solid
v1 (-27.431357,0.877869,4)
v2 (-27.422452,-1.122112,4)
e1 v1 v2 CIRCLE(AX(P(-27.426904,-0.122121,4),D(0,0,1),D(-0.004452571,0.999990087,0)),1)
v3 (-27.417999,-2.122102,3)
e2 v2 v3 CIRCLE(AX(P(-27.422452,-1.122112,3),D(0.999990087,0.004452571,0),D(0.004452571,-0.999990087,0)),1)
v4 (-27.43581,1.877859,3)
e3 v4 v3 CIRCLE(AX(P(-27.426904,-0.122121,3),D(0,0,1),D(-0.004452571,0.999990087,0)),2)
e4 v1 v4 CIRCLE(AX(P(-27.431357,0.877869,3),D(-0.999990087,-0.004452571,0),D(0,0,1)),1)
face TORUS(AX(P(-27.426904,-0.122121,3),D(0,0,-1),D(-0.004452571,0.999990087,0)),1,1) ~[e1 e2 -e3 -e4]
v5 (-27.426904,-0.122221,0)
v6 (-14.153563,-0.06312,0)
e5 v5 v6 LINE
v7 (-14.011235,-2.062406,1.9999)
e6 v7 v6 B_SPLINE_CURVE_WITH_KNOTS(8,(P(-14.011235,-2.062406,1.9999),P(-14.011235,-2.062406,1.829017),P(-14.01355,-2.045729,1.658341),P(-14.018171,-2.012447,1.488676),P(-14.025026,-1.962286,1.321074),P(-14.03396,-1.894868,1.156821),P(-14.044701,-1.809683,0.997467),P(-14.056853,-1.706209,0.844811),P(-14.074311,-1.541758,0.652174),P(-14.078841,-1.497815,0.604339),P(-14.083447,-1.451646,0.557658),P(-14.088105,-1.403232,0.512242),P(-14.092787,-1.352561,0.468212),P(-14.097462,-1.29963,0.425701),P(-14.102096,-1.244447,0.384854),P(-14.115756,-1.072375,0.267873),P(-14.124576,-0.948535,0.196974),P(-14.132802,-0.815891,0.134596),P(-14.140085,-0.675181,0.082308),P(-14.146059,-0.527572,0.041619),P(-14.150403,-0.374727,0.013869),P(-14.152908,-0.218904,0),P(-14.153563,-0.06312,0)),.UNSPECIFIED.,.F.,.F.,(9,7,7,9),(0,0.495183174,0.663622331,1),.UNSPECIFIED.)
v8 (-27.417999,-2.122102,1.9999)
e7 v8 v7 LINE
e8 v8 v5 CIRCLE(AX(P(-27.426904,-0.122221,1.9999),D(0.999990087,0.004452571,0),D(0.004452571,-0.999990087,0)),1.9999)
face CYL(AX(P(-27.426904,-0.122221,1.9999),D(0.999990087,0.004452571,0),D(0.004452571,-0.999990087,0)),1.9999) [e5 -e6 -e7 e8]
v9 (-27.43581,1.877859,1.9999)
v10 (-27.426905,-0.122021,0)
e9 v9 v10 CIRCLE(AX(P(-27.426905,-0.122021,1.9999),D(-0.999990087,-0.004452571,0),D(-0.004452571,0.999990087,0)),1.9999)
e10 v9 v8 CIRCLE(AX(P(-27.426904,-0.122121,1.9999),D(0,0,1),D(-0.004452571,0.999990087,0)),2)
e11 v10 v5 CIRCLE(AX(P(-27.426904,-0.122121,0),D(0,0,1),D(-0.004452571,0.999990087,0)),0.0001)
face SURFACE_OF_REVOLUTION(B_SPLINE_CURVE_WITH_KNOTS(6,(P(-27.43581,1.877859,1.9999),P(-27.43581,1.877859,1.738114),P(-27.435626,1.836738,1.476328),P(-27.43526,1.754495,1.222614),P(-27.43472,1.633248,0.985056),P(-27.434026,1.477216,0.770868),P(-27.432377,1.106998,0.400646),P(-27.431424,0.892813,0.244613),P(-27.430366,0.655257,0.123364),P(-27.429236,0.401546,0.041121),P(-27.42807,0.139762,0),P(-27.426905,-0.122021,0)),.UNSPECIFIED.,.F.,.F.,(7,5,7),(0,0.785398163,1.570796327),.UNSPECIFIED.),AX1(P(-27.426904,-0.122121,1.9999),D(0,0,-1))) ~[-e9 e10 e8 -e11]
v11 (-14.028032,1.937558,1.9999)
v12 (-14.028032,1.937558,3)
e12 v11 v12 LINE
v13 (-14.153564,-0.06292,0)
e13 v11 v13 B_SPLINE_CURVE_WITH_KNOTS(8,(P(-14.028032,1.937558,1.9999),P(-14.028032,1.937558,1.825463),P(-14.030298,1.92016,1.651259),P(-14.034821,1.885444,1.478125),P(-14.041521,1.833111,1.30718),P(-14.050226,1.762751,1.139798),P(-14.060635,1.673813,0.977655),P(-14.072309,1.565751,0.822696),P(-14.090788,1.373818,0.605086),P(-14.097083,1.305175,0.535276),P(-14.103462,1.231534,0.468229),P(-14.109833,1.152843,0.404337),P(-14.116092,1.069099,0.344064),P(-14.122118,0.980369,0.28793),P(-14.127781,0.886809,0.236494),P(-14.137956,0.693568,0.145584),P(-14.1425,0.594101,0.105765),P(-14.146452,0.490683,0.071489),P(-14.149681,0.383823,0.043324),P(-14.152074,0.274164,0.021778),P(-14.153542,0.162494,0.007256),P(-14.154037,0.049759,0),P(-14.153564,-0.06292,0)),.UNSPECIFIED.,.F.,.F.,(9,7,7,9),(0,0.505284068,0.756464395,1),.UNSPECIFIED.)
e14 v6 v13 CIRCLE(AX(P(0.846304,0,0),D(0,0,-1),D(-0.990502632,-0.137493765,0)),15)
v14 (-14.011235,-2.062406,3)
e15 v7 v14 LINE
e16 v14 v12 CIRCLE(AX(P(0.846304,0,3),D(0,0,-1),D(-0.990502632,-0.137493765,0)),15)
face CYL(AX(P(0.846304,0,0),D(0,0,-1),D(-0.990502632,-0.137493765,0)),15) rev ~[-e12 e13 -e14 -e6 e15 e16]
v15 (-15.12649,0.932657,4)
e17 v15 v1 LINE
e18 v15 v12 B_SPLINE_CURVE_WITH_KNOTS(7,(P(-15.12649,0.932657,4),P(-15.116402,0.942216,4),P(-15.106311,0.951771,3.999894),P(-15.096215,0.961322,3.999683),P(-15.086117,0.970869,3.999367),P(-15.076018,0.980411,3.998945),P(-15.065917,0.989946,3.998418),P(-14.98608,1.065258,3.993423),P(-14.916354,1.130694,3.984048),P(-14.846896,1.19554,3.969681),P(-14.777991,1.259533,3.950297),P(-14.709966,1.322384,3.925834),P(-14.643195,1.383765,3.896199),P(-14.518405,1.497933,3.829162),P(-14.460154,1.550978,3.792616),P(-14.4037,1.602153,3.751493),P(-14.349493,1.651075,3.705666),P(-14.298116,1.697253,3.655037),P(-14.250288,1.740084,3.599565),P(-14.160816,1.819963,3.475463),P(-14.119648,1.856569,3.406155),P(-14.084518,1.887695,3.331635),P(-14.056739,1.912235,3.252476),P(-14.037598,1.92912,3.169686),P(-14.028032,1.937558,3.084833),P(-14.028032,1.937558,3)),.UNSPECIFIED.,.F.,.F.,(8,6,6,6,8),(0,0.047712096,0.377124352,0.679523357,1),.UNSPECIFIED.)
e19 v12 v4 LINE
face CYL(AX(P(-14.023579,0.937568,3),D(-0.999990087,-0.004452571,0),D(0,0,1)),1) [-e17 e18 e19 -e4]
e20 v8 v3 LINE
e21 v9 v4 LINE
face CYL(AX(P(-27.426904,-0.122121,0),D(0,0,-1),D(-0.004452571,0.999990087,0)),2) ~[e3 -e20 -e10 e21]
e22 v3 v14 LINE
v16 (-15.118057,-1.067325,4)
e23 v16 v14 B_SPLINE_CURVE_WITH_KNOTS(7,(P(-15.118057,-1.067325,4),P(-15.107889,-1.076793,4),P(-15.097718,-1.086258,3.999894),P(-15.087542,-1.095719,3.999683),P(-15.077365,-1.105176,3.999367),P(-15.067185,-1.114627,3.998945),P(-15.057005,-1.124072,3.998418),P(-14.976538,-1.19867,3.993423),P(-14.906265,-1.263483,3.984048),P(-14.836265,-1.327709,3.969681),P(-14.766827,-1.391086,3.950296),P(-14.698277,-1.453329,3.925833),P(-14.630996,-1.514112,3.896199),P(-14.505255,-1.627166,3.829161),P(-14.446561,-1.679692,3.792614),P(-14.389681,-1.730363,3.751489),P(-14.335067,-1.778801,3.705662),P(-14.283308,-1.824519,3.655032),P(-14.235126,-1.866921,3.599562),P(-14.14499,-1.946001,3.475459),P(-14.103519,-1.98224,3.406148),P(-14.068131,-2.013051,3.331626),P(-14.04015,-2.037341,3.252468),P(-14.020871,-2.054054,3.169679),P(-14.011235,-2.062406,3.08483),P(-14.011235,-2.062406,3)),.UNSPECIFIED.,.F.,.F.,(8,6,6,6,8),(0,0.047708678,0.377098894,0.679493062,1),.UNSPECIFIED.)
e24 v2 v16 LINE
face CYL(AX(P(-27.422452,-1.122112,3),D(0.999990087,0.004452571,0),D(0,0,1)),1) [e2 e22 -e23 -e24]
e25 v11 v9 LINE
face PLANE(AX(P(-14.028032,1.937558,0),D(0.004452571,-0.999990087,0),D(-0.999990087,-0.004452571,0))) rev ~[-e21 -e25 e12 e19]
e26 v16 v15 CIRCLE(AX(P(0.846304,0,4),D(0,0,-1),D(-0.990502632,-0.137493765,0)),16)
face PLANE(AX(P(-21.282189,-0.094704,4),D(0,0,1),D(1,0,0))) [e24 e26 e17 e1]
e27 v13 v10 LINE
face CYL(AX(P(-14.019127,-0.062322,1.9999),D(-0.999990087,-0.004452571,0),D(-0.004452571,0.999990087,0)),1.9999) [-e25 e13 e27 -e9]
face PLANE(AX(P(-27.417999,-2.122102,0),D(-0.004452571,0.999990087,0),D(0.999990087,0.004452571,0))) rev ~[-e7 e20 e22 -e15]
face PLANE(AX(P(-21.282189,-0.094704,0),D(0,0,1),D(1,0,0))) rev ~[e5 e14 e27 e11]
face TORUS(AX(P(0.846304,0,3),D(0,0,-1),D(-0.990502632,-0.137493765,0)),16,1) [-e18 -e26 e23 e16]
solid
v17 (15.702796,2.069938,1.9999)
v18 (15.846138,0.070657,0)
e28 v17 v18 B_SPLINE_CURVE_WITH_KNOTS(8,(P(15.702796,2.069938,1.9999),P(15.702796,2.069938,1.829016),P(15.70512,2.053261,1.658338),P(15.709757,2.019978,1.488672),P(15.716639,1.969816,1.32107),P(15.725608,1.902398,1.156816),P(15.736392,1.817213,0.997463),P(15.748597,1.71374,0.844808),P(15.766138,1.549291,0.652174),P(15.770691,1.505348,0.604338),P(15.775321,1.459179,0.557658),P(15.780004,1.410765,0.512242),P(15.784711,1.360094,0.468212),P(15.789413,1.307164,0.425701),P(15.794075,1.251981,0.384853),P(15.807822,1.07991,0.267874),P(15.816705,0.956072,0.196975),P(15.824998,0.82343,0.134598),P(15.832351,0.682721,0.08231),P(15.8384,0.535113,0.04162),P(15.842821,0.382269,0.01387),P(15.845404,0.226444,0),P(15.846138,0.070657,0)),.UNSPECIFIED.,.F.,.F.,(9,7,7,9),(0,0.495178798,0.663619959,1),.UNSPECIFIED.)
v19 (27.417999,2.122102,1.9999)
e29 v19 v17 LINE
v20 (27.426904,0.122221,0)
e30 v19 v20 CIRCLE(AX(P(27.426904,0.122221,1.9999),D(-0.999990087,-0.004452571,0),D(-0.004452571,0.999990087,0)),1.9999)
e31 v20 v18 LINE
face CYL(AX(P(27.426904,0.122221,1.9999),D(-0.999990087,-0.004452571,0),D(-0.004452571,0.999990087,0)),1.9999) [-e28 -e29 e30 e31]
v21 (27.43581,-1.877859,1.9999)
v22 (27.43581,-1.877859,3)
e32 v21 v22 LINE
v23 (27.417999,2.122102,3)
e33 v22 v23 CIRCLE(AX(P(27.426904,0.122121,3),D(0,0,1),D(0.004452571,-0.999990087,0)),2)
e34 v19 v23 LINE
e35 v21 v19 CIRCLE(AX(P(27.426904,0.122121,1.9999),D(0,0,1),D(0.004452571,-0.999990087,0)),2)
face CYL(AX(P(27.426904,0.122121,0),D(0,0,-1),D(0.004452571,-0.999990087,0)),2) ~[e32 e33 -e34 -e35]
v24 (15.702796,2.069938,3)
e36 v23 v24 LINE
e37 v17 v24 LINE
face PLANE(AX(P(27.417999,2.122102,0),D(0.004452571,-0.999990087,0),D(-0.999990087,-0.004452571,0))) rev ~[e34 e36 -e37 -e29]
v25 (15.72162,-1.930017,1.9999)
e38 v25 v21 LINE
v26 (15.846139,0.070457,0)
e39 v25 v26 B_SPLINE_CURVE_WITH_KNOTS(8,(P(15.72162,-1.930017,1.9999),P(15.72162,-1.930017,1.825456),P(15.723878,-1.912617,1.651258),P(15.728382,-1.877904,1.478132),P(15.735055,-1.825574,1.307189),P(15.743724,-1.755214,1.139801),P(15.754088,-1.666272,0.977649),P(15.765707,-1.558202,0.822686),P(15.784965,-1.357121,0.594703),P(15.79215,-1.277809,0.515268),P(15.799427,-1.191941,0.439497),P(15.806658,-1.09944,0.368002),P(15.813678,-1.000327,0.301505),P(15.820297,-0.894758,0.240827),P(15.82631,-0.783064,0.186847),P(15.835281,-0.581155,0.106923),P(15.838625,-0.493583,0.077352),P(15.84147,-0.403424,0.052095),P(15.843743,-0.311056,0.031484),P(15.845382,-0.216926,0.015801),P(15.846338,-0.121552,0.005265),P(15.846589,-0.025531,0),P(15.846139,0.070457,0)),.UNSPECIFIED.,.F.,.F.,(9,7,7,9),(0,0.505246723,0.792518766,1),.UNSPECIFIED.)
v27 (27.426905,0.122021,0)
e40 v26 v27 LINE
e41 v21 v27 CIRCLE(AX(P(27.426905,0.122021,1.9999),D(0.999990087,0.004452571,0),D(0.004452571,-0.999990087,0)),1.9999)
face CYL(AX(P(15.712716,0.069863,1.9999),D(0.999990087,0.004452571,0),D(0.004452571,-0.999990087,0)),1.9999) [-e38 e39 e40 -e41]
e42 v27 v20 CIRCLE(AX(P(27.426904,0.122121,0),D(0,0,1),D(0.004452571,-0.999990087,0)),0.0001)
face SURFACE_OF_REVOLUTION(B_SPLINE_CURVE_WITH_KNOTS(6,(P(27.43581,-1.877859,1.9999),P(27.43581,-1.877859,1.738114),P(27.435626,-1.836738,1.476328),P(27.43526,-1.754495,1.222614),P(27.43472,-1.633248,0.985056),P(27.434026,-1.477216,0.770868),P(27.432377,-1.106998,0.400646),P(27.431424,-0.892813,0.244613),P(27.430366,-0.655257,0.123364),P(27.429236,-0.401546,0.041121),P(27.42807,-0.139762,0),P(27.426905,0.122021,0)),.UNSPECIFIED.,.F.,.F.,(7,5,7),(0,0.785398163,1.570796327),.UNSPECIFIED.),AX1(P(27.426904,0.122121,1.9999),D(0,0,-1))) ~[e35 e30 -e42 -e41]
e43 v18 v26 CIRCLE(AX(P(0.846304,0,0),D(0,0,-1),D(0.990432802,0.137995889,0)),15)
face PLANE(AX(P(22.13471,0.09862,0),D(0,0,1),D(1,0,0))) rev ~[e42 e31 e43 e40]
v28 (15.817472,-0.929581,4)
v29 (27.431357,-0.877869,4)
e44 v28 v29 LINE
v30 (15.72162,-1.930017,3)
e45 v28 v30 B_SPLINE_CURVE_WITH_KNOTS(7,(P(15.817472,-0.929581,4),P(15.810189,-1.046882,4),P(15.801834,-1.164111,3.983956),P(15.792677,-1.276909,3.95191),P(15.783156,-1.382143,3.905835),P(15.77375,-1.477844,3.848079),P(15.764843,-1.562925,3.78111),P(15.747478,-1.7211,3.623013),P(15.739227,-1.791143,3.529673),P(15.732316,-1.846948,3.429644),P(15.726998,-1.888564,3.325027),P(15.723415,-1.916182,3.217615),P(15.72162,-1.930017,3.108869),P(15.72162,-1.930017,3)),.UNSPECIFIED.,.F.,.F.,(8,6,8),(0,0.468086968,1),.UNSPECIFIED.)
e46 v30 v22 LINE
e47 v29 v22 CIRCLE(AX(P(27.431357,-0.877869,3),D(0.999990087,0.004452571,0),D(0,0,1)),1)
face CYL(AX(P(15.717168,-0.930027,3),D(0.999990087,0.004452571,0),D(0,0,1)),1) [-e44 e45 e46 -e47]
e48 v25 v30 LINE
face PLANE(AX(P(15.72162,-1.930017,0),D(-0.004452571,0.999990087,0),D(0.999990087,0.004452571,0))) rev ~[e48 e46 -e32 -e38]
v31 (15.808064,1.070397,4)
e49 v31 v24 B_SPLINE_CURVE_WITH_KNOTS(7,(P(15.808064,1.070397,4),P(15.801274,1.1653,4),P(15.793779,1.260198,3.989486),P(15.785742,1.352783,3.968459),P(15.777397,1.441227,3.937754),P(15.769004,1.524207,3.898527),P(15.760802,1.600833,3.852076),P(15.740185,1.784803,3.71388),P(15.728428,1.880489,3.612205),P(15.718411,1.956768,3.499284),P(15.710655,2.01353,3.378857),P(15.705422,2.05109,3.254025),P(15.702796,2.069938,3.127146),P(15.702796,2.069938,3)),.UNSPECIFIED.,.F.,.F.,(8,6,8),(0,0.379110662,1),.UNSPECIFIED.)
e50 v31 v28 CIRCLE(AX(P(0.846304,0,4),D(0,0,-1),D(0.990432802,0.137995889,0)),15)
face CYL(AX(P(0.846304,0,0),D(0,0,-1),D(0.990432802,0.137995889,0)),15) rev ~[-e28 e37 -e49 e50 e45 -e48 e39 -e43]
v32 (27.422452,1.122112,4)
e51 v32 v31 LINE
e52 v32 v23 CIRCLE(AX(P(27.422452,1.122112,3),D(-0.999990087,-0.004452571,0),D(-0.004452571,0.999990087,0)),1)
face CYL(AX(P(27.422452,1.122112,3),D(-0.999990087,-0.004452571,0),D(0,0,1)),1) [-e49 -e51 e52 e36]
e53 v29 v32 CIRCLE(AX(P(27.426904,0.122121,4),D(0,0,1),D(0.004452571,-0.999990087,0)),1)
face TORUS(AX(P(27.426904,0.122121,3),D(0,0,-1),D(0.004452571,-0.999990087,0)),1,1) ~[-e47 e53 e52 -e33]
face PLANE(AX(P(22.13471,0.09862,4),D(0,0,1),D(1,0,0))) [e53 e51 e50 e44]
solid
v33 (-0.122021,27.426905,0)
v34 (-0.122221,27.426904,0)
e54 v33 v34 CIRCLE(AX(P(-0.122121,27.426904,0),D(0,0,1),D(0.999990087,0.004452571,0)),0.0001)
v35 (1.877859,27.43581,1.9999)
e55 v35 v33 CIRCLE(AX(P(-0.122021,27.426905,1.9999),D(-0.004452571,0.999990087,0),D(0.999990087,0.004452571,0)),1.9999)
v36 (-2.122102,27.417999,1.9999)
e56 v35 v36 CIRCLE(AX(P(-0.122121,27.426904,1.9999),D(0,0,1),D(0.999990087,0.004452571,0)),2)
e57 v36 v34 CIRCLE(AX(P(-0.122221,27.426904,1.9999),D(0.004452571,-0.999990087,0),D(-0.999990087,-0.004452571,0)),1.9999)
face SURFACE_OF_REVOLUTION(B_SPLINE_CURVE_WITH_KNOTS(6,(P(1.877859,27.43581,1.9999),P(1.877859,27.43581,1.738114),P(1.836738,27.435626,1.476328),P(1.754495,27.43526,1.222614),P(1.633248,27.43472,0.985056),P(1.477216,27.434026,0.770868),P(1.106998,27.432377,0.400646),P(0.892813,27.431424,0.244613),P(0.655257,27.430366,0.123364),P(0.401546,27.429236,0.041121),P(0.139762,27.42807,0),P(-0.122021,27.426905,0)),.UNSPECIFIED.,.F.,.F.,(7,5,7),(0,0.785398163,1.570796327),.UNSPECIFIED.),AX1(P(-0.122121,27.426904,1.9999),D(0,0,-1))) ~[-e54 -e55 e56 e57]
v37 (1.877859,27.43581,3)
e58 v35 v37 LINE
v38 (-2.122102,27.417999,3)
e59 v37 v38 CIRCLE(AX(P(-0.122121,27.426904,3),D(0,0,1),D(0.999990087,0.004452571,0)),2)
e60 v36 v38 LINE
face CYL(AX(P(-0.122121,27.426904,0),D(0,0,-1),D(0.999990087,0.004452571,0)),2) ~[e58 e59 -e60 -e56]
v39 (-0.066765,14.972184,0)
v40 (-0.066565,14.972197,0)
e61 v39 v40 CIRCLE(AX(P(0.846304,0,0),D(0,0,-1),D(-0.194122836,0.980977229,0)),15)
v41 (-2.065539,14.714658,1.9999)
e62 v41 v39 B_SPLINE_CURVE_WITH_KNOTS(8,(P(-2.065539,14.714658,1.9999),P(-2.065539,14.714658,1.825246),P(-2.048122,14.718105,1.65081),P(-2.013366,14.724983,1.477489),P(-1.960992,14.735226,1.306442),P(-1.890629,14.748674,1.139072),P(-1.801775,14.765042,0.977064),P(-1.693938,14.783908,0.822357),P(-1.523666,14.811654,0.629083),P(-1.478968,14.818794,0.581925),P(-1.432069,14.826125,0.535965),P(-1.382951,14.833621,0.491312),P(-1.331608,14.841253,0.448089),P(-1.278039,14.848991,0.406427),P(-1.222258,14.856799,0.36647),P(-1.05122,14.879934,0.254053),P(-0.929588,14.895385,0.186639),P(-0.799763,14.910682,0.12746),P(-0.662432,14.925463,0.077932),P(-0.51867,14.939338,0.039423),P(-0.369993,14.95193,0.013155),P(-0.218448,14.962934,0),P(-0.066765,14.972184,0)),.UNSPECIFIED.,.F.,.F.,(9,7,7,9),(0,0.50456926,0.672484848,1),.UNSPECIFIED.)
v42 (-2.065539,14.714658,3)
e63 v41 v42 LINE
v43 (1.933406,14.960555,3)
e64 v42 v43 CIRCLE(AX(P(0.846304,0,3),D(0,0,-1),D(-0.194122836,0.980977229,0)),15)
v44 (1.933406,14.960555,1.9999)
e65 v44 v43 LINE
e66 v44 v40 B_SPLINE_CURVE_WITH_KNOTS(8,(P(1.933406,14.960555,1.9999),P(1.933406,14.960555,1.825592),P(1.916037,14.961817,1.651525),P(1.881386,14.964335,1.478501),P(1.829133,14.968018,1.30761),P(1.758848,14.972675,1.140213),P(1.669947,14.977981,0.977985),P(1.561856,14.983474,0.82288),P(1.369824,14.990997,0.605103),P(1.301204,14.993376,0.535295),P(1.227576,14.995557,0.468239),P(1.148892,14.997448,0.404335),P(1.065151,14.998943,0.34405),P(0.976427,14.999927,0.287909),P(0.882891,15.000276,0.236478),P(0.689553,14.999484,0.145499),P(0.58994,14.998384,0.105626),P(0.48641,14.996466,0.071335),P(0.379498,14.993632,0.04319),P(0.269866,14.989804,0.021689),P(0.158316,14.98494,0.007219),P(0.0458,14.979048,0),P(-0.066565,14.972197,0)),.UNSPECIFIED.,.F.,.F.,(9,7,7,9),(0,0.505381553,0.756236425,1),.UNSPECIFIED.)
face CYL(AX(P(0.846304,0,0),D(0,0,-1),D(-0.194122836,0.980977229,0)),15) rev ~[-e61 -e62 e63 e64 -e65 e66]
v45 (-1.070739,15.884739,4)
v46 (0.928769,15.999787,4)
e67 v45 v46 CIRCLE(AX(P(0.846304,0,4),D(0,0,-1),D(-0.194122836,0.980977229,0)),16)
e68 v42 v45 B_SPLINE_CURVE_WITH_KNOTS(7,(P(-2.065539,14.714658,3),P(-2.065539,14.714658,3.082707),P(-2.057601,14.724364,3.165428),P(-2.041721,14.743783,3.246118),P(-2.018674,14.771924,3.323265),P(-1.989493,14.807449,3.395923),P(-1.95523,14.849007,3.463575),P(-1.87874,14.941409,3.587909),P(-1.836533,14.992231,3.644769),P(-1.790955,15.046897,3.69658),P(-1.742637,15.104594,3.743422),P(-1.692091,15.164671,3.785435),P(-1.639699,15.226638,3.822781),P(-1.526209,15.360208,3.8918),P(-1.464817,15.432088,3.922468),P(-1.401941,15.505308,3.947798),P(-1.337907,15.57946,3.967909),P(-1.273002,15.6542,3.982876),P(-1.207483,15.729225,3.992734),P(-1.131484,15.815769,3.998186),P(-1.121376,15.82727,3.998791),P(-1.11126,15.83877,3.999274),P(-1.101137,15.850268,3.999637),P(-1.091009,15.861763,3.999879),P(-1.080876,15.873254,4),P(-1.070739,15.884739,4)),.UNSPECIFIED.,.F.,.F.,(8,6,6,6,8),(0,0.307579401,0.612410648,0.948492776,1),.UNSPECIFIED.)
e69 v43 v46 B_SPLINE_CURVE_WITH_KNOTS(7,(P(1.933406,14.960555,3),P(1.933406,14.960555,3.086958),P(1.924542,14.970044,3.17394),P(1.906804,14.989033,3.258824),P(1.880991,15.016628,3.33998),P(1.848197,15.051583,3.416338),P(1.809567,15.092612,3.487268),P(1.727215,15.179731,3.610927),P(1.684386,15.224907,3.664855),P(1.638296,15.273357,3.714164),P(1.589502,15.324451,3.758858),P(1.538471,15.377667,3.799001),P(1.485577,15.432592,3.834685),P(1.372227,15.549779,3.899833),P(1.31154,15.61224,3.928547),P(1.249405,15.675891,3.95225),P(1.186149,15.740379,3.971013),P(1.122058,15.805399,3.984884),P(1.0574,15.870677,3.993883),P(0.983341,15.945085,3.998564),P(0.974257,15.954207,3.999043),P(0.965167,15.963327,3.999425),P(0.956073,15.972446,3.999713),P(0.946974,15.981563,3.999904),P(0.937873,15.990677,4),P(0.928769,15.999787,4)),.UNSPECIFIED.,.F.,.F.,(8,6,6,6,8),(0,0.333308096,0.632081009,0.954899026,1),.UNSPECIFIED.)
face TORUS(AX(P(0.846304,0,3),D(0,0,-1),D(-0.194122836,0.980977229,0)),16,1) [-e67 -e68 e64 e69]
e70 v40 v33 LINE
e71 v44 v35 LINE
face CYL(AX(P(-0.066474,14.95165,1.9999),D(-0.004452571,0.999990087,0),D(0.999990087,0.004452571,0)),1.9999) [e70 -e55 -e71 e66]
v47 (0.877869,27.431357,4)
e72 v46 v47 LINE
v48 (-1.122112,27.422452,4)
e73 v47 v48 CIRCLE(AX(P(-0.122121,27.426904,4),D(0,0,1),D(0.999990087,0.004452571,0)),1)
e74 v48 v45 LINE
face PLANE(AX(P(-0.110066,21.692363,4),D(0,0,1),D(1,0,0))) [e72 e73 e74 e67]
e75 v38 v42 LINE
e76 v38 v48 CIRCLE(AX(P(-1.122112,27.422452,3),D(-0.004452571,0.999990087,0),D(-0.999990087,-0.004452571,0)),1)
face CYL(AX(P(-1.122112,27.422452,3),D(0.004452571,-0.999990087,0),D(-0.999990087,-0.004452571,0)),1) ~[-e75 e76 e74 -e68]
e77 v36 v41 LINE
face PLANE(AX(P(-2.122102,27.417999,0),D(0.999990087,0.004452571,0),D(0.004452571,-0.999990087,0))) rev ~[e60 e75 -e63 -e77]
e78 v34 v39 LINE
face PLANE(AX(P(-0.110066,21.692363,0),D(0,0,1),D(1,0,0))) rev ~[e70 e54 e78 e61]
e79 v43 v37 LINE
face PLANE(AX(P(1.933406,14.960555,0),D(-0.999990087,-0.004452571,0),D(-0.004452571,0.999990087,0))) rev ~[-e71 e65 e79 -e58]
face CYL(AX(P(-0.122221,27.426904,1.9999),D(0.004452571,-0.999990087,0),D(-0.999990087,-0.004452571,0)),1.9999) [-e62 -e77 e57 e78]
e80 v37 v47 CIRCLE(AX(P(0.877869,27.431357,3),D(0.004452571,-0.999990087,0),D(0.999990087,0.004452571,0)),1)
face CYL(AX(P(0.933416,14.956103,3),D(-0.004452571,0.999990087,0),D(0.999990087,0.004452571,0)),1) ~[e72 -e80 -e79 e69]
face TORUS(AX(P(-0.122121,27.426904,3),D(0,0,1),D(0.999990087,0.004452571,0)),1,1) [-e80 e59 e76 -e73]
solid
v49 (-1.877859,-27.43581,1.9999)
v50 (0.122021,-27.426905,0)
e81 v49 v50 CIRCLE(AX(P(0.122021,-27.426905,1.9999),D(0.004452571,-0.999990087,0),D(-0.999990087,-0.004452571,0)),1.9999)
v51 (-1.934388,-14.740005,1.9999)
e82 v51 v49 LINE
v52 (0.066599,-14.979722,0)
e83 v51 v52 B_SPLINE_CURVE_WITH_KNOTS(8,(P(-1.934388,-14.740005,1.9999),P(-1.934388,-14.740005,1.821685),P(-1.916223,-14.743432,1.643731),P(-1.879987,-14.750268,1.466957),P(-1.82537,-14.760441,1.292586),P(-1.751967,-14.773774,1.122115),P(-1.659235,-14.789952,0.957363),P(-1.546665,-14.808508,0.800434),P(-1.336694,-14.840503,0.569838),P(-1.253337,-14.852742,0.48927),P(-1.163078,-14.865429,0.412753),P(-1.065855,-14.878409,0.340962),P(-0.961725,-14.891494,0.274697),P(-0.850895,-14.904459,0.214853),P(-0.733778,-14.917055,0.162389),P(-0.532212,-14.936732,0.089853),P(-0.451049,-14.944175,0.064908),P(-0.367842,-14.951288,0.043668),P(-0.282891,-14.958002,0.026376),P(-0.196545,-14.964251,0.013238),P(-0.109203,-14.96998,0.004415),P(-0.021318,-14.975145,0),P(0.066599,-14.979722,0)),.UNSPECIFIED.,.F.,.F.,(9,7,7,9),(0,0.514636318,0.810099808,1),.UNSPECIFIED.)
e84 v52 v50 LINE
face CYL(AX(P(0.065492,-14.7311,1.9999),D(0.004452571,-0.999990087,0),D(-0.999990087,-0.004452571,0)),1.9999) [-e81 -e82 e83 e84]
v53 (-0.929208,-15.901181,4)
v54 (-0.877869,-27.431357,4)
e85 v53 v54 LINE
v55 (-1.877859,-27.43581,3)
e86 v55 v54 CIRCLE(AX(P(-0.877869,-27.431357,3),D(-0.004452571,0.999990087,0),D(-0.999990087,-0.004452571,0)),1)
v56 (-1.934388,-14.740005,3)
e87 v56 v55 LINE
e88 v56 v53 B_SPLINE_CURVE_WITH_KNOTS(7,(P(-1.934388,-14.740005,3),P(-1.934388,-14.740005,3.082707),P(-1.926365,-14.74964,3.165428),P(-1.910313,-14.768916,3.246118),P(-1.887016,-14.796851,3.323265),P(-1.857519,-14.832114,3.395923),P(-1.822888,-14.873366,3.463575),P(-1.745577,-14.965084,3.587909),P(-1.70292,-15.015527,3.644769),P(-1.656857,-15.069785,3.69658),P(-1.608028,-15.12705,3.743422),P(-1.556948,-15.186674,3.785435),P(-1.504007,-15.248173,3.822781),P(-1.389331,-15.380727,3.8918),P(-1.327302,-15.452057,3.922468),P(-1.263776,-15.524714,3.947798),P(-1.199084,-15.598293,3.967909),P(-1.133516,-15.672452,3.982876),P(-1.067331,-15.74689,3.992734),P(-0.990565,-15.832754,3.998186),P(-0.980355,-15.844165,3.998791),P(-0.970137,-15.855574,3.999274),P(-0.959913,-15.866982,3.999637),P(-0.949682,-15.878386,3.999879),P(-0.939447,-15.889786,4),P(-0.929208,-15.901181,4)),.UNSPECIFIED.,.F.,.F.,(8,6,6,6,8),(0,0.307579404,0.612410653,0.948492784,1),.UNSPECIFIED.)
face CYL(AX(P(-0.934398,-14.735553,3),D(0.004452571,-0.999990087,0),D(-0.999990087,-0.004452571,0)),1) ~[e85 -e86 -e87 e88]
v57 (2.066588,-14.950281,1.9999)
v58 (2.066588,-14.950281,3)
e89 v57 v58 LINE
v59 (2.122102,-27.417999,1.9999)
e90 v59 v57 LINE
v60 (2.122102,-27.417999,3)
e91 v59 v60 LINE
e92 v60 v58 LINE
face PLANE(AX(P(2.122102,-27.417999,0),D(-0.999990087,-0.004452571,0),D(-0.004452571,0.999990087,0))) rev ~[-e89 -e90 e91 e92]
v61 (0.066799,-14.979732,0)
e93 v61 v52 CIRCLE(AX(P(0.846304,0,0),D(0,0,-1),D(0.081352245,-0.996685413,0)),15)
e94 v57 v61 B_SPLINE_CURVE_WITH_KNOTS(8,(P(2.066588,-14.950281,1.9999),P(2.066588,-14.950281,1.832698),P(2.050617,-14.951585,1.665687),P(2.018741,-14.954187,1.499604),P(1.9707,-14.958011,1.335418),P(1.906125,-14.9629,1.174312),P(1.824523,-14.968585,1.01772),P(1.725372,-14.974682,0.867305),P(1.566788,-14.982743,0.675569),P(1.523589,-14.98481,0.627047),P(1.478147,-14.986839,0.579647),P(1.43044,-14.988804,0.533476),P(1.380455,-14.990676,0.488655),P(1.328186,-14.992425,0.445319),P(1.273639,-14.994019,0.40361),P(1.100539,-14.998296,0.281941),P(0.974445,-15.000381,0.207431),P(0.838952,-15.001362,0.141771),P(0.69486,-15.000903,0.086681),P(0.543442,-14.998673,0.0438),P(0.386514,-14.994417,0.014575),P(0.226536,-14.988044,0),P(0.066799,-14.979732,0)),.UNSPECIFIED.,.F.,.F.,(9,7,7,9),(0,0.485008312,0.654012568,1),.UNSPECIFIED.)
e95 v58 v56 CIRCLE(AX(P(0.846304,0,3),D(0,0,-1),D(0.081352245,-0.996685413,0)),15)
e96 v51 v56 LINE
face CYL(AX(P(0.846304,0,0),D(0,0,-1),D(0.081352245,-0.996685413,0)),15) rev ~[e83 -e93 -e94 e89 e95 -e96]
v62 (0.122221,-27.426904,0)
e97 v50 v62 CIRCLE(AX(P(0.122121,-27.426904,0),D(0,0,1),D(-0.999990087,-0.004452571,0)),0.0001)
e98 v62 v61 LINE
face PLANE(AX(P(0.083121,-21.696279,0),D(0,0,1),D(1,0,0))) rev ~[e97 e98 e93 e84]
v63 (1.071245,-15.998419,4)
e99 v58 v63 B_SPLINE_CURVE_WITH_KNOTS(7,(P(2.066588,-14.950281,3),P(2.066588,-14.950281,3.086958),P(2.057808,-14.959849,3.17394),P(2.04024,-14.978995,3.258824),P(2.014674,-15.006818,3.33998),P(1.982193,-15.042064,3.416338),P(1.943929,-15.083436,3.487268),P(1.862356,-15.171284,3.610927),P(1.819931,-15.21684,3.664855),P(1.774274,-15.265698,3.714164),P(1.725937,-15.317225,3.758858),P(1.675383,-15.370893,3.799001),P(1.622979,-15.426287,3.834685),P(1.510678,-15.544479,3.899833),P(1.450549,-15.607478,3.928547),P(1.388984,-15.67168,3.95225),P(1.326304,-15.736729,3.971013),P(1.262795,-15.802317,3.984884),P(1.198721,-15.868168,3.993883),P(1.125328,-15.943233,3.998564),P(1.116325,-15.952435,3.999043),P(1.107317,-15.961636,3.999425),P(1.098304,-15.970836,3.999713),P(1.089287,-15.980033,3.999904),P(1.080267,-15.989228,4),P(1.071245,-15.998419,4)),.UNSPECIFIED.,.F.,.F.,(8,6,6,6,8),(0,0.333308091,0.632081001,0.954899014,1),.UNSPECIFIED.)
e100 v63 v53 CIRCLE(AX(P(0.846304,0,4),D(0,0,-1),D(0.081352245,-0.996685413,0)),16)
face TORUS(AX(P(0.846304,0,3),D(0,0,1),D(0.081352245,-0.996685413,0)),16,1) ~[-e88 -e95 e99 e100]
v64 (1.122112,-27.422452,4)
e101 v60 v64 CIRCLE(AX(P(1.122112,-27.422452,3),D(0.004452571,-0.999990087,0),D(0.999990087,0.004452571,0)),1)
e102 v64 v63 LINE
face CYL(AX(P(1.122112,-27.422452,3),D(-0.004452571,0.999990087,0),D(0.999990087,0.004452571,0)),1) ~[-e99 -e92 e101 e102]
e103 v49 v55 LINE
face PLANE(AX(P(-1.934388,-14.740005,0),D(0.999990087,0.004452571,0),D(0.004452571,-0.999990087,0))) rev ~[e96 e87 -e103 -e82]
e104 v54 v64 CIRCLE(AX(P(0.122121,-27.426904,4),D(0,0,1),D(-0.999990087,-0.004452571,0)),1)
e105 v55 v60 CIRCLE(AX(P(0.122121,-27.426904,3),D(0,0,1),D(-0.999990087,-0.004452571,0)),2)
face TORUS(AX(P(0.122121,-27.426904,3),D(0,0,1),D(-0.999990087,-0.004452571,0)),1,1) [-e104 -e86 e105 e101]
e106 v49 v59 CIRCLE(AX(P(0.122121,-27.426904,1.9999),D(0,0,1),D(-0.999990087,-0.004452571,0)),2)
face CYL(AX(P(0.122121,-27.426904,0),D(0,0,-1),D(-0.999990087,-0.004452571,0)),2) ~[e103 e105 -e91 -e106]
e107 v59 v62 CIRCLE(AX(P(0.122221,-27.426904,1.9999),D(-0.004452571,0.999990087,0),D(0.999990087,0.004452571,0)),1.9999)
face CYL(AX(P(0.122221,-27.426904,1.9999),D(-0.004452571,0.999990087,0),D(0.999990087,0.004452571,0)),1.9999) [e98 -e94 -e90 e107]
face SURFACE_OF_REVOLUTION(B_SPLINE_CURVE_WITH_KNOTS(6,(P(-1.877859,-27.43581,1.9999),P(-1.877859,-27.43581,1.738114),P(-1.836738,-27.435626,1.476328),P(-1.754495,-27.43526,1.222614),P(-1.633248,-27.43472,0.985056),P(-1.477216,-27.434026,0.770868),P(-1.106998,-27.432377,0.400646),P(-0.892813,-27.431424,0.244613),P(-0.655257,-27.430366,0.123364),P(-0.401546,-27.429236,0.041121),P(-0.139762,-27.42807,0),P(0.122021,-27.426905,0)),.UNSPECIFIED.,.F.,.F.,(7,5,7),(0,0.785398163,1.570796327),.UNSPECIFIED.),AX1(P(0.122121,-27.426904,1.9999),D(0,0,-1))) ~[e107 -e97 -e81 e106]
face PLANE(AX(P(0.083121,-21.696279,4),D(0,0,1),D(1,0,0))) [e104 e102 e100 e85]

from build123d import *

# Parameters (mm, degrees)
F1_DEPTH = 4
F2_R     = 1.9999
F2_2_R   = 1.9999
F2_3_R   = 1.9999
F2_4_R   = 1.9999
F3_R     = 1
F3_2_R   = 1
F3_3_R   = 1
F3_4_R   = 1


# Not quite as in the source:
# - a fillet or chamfer is up to 0.001 mm smaller than in the source, because OpenCascade refuses the exact size


with BuildPart() as f1:
    # F0 (on Top) → F1 (new body)
    with BuildSketch(Plane.XY):
        with BuildLine():
            ThreePointArc((-2.065538543, 14.7146584401), (-0.0743129661, 14.9717221589), (1.9334062251, 14.960555095))
            Line((1.9334062251, 14.960555095), (1.8778587128, 27.4358095681))
            ThreePointArc((1.8778587128, 27.4358095681), (-0.1310266046, 29.4268845997), (-2.1221016363, 27.4179992823))
            Line((-2.1221016363, 27.4179992823), (-2.065538543, 14.7146584401))
        make_face()
    extrude(amount=F1_DEPTH)

    # F2#3 (radius 2 in the source; OpenCascade refuses exactly that, so slightly less here)
    f2_3_edges = [f1.edges().sort_by_distance(p)[0] for p in [
        (1.905632, 21.198182, 0),
    ]]
    fillet(f2_3_edges, radius=F2_3_R)

    # F3#3
    f3_3_edges = [f1.edges().sort_by_distance(p)[0] for p in [
        (-2.09382, 21.066329, 4),
        (-0.074313, 14.971722, 4),
        (1.905632, 21.198182, 4),
        (-0.131027, 29.426885, 4),
    ]]
    fillet(f3_3_edges, radius=F3_3_R)


with BuildPart() as f1b:
    # F0 (on Top) → F1, piece 2 (new body)
    with BuildSketch(Plane.XY):
        with BuildLine():
            ThreePointArc((15.7027960238, 2.0699383398), (15.8461378969, 0.0705907094), (15.7216202135, -1.9300174947))
            Line((15.7216202135, -1.9300174947), (27.4358095681, -1.8778587128))
            ThreePointArc((27.4358095681, -1.8778587128), (29.4268845997, 0.1310266046), (27.4179992823, 2.1221016363))
            Line((27.4179992823, 2.1221016363), (15.7027960238, 2.0699383398))
        make_face()
    extrude(amount=F1_DEPTH)

    # F2#2 (radius 2 in the source; OpenCascade refuses exactly that, so slightly less here)
    f2_2_edges = [f1b.edges().sort_by_distance(p)[0] for p in [
        (21.578715, -1.903938, 0),
    ]]
    fillet(f2_2_edges, radius=F2_2_R)

    # F3#2
    f3_2_edges = [f1b.edges().sort_by_distance(p)[0] for p in [
        (21.578715, -1.903938, 4),
    ]]
    fillet(f3_2_edges, radius=F3_2_R)


with BuildPart() as f1c:
    # F0 (on Top) → F1, piece 3 (new body)
    with BuildSketch(Plane.XY):
        with BuildLine():
            Line((-14.0280318673, 1.9375583925), (-27.4358095681, 1.8778587127))
            ThreePointArc((-27.4358095681, 1.8778587128), (-29.4268845997, -0.1310266046), (-27.4179992823, -2.1221016363))
            Line((-27.4179992823, -2.1221016363), (-14.0112354856, -2.062406471))
            ThreePointArc((-14.0112354856, -2.062406471), (-14.153563757, -0.0629864294), (-14.0280318673, 1.9375583925))
        make_face()
    extrude(amount=F1_DEPTH)

    # F2#4 (radius 2 in the source; OpenCascade refuses exactly that, so slightly less here)
    f2_4_edges = [f1c.edges().sort_by_distance(p)[0] for p in [
        (-20.714617, -2.092254, 0),
    ]]
    fillet(f2_4_edges, radius=F2_4_R)

    # F3#4
    f3_4_edges = [f1c.edges().sort_by_distance(p)[0] for p in [
        (-20.714617, -2.092254, 4),
        (-14.153564, -0.062986, 4),
        (-20.731921, 1.907709, 4),
        (-29.426885, -0.131027, 4),
    ]]
    fillet(f3_4_edges, radius=F3_4_R)


with BuildPart() as f1d:
    # F0 (on Top) → F1, piece 4 (new body)
    with BuildSketch(Plane.XY):
        with BuildLine():
            ThreePointArc((-1.8778587128, -27.4358095681), (0.1310266046, -29.4268845997), (2.1221016363, -27.4179992823))
            Line((2.1221016363, -27.4179992823), (2.0665876805, -14.9502811926))
            ThreePointArc((2.0665876805, -14.9502811926), (0.0590475403, -14.9793266627), (-1.9343882494, -14.7400051091))
            Line((-1.9343882494, -14.7400051091), (-1.8778587128, -27.4358095681))
        make_face()
    extrude(amount=F1_DEPTH)

    # F2 (radius 2 in the source; OpenCascade refuses exactly that, so slightly less here)
    f2_edges = [f1d.edges().sort_by_distance(p)[0] for p in [
        (2.094345, -21.18414, 0),
    ]]
    fillet(f2_edges, radius=F2_R)

    # F3
    f3_edges = [f1d.edges().sort_by_distance(p)[0] for p in [
        (-1.906123, -21.087907, 4),
        (0.131027, -29.426885, 4),
        (2.094345, -21.18414, 4),
        (0.059048, -14.979327, 4),
    ]]
    fillet(f3_edges, radius=F3_R)


solid = Compound([f1.part, f1b.part, f1c.part, f1d.part])
